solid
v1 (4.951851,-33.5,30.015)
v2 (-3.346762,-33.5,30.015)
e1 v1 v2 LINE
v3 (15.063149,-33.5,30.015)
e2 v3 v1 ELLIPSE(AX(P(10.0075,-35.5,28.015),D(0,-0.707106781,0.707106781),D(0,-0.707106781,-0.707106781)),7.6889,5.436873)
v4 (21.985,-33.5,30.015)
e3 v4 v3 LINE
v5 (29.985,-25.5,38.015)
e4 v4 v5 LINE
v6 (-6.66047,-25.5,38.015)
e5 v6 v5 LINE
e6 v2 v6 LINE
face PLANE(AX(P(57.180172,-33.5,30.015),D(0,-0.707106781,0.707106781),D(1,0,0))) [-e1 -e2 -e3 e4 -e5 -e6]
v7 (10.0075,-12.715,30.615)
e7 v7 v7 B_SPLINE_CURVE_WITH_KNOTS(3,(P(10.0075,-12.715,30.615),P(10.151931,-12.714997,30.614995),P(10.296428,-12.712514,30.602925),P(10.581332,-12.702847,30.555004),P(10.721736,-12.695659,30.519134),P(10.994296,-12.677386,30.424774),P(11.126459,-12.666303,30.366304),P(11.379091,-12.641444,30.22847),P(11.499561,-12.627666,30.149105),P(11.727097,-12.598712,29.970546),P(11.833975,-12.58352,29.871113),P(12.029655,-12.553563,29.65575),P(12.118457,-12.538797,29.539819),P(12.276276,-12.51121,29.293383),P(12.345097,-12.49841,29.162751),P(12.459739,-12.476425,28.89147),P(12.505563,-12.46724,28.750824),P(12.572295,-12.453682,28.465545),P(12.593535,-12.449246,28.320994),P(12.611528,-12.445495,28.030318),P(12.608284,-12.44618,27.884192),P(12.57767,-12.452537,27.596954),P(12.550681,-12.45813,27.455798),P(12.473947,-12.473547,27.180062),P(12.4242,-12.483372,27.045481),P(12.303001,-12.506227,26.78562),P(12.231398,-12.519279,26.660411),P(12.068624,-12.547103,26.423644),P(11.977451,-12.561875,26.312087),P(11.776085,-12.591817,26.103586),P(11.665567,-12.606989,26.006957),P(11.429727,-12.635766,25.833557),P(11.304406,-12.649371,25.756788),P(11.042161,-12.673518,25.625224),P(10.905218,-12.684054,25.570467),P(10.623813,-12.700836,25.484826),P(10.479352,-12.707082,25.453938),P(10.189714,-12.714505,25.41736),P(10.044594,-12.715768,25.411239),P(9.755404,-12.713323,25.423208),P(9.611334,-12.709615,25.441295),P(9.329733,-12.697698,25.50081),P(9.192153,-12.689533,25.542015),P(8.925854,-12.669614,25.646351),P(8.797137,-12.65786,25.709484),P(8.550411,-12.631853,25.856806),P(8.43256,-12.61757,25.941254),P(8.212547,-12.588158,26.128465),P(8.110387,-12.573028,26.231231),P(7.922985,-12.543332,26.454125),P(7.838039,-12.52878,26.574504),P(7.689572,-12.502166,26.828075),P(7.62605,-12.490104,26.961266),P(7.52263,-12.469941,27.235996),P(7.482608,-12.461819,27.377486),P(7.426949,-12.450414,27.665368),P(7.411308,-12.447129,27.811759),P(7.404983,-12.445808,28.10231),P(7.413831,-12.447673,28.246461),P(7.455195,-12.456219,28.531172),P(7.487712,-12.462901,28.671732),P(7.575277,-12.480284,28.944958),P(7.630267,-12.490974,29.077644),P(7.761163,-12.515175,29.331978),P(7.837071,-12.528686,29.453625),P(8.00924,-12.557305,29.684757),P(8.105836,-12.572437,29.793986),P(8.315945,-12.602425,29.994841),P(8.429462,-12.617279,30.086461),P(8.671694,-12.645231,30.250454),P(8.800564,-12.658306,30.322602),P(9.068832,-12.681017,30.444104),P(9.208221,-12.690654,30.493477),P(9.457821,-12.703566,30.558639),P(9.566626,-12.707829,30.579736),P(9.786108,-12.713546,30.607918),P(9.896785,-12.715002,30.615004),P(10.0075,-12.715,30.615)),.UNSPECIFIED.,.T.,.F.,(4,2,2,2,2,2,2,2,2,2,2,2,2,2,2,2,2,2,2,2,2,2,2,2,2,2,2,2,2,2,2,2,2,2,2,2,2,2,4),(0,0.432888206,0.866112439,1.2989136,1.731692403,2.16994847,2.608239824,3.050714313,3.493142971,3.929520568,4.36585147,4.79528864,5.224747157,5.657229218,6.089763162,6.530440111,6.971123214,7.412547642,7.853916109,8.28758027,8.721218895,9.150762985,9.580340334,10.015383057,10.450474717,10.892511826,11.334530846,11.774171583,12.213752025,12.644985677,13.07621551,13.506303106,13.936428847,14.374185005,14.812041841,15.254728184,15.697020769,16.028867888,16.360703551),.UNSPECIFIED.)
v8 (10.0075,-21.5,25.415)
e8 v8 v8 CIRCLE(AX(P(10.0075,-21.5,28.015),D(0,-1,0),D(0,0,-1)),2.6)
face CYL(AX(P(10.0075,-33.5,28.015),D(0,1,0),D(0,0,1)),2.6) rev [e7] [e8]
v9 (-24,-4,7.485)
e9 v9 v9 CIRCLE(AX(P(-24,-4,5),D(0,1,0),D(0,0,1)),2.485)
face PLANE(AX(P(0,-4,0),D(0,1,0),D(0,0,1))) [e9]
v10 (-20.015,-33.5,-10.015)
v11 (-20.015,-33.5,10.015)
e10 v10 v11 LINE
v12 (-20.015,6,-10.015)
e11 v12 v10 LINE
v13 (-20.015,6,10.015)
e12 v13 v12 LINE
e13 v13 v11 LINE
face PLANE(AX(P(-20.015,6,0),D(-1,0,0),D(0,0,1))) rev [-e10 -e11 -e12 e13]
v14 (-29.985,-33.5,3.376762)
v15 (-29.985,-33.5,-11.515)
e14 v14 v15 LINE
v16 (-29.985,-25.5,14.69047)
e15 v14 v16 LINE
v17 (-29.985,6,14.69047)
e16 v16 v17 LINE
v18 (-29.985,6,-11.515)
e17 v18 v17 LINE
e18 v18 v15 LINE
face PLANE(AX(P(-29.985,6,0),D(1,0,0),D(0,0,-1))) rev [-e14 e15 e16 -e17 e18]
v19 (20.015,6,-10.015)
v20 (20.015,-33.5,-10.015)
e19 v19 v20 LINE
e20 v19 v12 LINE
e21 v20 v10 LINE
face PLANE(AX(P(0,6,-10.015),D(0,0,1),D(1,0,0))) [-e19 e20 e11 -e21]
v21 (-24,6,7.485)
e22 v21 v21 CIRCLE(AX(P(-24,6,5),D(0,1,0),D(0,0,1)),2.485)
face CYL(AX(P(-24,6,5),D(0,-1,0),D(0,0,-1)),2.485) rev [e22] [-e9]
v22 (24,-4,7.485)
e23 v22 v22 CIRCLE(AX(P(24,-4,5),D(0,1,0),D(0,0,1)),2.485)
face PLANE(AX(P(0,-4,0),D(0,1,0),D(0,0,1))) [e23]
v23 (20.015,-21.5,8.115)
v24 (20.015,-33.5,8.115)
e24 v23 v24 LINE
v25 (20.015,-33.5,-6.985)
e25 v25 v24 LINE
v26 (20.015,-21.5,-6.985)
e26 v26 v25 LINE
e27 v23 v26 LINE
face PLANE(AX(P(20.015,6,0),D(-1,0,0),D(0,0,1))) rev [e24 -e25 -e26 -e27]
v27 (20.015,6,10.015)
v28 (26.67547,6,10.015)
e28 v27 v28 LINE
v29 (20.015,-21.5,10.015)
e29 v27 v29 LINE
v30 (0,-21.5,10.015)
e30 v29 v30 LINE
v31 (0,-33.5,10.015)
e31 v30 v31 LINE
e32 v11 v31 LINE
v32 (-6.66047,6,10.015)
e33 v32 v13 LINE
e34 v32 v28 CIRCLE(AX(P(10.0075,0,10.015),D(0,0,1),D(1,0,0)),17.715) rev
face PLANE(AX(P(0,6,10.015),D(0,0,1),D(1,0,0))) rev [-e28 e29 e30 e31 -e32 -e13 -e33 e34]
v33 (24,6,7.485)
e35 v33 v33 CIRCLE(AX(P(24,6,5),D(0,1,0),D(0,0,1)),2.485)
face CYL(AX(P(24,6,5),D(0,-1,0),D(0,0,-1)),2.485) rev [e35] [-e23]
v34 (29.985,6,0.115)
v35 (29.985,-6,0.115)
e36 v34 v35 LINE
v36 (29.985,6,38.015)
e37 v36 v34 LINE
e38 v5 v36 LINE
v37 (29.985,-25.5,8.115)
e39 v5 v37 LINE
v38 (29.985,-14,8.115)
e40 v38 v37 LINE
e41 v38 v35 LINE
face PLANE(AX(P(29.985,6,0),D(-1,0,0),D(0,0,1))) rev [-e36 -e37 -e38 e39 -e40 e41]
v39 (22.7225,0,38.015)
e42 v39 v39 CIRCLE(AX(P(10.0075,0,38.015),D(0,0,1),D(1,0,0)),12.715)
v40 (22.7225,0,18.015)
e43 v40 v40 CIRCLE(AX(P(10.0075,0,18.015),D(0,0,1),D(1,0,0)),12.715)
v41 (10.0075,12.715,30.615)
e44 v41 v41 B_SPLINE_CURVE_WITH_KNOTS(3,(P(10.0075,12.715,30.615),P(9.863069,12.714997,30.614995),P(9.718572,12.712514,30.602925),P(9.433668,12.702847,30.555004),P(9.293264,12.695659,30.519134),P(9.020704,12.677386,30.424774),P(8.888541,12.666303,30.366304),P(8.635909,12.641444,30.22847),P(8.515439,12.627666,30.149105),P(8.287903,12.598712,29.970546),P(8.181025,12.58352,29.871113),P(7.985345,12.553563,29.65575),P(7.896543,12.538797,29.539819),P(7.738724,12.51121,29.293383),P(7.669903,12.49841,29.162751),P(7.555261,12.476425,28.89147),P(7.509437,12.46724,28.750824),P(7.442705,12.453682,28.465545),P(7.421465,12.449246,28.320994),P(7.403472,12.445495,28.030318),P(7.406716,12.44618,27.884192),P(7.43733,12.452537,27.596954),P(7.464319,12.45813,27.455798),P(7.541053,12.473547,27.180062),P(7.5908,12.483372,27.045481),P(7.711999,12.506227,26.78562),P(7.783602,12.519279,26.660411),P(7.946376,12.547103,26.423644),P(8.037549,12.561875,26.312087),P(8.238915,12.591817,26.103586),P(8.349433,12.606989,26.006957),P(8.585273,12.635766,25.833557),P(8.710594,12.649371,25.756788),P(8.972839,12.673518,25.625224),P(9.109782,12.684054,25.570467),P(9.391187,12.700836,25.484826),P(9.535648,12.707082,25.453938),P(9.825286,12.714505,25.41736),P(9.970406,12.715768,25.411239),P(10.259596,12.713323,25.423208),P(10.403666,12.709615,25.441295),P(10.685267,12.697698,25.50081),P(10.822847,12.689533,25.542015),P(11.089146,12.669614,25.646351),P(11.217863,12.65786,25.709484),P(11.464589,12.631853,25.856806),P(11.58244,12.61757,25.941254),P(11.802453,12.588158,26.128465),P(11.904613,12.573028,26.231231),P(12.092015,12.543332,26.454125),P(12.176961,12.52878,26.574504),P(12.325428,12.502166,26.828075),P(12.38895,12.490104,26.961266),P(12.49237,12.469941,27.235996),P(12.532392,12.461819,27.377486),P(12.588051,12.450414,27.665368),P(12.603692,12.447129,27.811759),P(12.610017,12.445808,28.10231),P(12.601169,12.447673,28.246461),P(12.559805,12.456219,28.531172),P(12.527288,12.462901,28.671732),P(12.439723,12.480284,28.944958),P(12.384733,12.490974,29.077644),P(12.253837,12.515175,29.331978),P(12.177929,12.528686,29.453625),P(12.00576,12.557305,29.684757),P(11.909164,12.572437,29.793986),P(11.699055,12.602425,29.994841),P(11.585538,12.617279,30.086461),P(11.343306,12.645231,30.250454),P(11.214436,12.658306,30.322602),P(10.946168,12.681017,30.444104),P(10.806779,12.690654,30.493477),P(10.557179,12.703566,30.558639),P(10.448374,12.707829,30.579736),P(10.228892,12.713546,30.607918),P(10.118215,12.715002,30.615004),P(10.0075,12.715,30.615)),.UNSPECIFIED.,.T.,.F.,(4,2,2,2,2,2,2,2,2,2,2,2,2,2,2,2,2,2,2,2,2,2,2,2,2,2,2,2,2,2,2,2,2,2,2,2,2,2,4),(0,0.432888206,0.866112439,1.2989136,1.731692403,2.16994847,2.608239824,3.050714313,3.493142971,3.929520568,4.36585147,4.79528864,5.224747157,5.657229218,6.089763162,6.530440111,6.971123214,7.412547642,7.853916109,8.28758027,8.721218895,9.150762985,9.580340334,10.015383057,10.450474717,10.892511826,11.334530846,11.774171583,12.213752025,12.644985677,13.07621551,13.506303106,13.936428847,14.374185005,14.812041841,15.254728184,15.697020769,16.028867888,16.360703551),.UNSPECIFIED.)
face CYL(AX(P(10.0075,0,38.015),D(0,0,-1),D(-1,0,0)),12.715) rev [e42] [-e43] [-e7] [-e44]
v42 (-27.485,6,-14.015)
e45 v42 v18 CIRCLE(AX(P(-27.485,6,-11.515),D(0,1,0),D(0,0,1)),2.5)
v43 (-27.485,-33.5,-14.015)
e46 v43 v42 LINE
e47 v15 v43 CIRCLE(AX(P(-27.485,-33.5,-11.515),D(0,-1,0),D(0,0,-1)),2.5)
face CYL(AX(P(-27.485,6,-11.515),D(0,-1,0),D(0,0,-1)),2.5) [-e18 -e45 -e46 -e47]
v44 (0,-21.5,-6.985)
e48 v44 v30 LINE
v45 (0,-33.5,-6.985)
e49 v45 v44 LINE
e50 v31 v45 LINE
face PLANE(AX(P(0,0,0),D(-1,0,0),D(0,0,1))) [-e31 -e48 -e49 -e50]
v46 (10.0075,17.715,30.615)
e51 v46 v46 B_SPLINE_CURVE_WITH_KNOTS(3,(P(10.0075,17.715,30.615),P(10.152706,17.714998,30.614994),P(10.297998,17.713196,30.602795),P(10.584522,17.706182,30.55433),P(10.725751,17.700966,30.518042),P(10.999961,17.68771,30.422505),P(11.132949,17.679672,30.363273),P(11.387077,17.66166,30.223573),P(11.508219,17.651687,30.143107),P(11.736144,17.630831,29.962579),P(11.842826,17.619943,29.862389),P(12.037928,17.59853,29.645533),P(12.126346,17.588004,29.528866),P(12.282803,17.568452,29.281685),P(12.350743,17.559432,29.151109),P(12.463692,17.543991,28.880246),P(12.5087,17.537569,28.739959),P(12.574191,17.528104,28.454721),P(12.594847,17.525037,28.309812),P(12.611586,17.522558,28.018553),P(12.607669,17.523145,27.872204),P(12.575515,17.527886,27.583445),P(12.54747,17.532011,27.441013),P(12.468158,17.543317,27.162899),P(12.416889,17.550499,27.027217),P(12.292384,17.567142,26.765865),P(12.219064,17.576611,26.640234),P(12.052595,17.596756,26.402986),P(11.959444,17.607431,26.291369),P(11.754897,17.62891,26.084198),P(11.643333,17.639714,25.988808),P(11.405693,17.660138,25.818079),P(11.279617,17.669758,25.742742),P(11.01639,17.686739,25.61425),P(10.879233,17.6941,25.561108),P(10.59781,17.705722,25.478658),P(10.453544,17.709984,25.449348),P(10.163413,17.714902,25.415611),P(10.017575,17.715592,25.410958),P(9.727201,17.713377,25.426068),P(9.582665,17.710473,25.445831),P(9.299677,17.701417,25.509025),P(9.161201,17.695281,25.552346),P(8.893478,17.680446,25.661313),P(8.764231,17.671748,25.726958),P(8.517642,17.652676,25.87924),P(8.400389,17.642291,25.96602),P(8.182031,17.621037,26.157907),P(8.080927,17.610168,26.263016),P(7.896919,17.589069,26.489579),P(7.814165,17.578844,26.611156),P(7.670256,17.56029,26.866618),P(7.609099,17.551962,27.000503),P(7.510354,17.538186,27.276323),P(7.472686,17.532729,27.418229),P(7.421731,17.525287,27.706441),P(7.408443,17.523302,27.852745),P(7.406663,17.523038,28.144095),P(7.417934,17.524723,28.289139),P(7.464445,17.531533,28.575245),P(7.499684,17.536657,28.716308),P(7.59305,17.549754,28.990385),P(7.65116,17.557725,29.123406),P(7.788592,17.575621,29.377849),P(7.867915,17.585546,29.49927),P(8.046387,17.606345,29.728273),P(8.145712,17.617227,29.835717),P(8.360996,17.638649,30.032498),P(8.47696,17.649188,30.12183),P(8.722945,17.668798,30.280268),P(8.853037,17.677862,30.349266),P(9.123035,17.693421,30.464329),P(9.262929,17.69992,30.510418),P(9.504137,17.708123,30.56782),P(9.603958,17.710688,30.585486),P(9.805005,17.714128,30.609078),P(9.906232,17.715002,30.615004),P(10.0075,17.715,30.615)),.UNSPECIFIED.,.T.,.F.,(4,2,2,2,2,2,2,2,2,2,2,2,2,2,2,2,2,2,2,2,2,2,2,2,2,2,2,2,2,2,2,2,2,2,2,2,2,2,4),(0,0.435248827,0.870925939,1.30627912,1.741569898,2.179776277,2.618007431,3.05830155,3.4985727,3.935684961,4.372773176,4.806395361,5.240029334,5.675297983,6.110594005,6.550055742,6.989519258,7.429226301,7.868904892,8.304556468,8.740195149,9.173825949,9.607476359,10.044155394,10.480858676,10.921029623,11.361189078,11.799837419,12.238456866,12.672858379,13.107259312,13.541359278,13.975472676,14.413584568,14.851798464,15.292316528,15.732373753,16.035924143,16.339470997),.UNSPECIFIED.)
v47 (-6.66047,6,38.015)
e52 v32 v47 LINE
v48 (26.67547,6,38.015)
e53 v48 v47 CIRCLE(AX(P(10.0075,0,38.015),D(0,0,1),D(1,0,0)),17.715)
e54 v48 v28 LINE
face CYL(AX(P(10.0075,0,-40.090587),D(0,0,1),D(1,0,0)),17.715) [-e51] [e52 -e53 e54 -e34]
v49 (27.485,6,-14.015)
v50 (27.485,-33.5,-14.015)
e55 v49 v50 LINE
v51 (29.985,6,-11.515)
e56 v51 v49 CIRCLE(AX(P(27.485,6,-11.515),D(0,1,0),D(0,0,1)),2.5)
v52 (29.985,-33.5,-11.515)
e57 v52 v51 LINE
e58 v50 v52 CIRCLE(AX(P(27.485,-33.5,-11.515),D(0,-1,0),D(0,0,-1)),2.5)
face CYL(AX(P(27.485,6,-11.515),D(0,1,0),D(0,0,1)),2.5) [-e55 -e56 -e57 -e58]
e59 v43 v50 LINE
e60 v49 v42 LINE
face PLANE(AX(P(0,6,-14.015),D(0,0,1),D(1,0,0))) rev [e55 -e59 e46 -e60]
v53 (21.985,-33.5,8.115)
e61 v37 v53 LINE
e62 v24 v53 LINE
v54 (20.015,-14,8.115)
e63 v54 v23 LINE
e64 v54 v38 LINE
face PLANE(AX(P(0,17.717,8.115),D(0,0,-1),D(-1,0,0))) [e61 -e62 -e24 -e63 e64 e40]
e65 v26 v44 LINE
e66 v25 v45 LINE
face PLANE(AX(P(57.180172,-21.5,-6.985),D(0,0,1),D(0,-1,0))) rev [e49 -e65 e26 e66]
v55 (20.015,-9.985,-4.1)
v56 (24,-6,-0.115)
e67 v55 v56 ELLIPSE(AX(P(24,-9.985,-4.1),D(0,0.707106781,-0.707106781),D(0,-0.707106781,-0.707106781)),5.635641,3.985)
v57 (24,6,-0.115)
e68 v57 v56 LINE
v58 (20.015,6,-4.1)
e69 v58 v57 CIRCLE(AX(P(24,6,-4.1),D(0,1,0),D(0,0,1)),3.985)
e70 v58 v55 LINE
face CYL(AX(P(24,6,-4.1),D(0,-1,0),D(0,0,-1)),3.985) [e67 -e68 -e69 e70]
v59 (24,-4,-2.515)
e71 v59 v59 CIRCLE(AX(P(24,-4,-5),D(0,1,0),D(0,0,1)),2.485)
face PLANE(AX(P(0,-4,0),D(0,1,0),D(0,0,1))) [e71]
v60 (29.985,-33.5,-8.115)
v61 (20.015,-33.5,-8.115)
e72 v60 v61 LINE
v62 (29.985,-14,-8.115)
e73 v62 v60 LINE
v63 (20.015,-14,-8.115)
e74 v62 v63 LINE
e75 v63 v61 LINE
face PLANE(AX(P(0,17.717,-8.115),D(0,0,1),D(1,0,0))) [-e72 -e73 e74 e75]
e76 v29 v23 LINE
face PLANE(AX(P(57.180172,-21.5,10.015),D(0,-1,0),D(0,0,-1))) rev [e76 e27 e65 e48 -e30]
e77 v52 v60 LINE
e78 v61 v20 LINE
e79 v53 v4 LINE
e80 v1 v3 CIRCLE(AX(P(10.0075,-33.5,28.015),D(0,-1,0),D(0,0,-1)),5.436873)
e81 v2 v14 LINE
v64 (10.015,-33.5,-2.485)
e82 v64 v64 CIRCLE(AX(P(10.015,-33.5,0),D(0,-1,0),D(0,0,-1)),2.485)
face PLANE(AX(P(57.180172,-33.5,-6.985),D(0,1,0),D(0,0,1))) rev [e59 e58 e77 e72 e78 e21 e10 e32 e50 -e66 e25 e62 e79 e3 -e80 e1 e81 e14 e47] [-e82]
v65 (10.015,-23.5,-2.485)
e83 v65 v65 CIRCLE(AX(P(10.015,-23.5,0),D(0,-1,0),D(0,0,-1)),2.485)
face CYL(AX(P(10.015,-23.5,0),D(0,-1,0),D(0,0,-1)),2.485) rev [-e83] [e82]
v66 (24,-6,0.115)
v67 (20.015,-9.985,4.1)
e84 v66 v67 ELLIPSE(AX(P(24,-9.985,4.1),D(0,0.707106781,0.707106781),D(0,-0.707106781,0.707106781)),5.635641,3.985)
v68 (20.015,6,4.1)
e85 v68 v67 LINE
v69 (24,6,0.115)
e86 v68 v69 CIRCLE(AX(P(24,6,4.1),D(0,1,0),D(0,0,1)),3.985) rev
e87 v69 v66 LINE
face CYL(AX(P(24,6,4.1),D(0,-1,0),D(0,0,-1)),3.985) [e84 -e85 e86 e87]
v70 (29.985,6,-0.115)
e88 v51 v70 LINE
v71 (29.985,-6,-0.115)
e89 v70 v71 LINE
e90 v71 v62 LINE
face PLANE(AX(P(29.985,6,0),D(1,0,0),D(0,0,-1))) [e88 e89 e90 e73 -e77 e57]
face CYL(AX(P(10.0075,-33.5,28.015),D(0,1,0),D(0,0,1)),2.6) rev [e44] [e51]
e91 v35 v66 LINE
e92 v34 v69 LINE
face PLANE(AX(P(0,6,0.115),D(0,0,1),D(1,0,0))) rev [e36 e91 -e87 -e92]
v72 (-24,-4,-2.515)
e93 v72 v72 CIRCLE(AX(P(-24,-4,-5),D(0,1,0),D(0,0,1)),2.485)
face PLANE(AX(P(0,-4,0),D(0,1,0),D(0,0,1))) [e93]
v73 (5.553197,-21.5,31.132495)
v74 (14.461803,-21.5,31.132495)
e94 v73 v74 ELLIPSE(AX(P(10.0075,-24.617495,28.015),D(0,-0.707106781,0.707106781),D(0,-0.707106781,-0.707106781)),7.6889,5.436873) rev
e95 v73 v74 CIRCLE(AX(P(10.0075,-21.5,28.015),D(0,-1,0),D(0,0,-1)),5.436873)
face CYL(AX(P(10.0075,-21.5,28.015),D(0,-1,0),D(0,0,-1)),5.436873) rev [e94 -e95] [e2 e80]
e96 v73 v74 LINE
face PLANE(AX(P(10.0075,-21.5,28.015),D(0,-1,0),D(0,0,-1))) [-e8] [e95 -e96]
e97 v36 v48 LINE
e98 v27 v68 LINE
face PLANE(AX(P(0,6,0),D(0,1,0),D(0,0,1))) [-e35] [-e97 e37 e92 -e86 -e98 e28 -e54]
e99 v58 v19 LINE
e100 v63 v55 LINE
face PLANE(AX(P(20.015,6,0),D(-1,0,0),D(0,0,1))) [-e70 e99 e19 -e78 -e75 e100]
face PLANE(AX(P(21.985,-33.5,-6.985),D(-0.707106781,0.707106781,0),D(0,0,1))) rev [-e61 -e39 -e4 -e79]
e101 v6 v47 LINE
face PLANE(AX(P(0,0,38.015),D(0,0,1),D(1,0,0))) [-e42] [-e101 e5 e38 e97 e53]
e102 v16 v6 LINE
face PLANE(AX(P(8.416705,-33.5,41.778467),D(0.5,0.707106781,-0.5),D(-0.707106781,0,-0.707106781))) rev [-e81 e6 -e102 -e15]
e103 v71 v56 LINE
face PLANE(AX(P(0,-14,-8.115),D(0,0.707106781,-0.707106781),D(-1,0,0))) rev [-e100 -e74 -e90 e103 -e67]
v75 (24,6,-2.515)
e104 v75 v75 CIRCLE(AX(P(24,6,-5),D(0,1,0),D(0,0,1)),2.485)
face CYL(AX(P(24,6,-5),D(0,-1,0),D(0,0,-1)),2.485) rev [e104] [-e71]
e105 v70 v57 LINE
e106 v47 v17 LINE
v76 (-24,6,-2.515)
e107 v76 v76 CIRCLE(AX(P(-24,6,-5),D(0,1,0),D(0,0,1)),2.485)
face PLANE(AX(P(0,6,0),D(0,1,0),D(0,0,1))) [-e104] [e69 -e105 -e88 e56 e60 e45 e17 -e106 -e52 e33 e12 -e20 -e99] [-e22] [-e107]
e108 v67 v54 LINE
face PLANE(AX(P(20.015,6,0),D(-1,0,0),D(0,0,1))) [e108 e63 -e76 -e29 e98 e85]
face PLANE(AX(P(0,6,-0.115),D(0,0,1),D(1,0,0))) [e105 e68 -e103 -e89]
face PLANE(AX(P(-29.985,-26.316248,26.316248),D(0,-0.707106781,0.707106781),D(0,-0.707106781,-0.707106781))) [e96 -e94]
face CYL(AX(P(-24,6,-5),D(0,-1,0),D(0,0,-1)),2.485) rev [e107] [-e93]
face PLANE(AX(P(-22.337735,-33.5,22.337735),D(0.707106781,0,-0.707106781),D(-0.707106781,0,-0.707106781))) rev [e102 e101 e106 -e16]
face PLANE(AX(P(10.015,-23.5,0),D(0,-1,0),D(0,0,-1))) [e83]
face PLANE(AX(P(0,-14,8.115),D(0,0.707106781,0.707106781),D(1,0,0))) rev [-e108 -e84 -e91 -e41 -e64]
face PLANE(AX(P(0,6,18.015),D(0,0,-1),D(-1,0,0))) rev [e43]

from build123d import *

# Parameters (mm, degrees)
SKETCH1_R               = 2.485
SKETCH1_W               = 55.97
SKETCH1_H               = 4
SKETCH1_W_2             = 2
BOSS_EXTRUDE1_DEPTH     = 6
SKETCH2_R               = 2.485
BOSS_EXTRUDE2_DEPTH     = 2
BOSS_EXTRUDE3_DEPTH     = 20.015
SKETCH6_R               = 2.485
CUT_EXTRUDE3_DEPTH      = 10
SKETCH11_R              = 17.715
BOSS_EXTRUDE4_DEPTH     = 8
BOSS_EXTRUDE5_START     = 20
SKETCH11_3_R            = 17.715
SKETCH11_3_R_2          = 12.715
BOSS_EXTRUDE5_DEPTH     = 20
BOSS_EXTRUDE7_DEPTH     = 20
CUT_EXTRUDE7_DEPTH      = 63.485922014
CUT_EXTRUDE7_DEPTH_BACK = 63.485922014
CUT_EXTRUDE8_DEPTH      = 72.185604057
CUT_EXTRUDE8_DEPTH_BACK = 72.185604057
FILLET1_R               = 2.5
CUT_EXTRUDE9_DEPTH      = 59.876909311
CUT_EXTRUDE9_DEPTH_BACK = 59.876909311
SKETCH16_R              = 2.6
SKETCH17_R              = 5.436873337
SKETCH17_R_2            = 2.6
CUT_EXTRUDE10_DEPTH     = 12
BOSS_EXTRUDE8_REACH     = 72.478
SKETCH18_R              = 5.436873337
CHAMFER1_SIZE           = 8
CHAMFER2_SIZE           = 8


# Some blends are built 0.0001 mm under size
with BuildPart() as part:
    # Sketch1 → Boss-Extrude1 (new, symmetric)
    # profile 1 of 8: a face of its own
    with BuildSketch(Plane(origin=(0, 0, 0), x_dir=(1, 0, 0), z_dir=(0, 1, 0))):
        with BuildLine():
            ThreePointArc((24, -0.115), (21.182179477, -1.282179477), (20.015, -4.1))
            Line((20.015, -4.1), (20.015, -10.015))
            Line((20.015, -10.015), (-20.015, -10.015))
            Line((-20.015, -10.015), (-20.015, 10.015))
            Line((-20.015, 10.015), (20.015, 10.015))
            Line((20.015, 10.015), (20.015, 4.1))
            ThreePointArc((20.015, 4.1), (21.182179477, 1.282179477), (24, 0.115))
            ThreePointArc((24, 0.115), (26.817820523, 1.282179477), (27.985, 4.1))
            Line((27.985, 4.1), (27.985, 14.015))
            Line((27.985, 14.015), (-27.985, 14.015))
            Line((-27.985, 14.015), (-27.985, -14.015))
            Line((-27.985, -14.015), (27.985, -14.015))
            Line((27.985, -14.015), (27.985, -4.1))
            ThreePointArc((27.985, -4.1), (26.817820523, -1.282179477), (24, -0.115))
        make_face()
        with Locations(Location((-24, -5, 0), (0, 0, 270))):
            Circle(SKETCH1_R, mode=Mode.SUBTRACT)
        with Locations(Location((-24, 5, 0), (0, 0, 270))):
            Circle(SKETCH1_R, mode=Mode.SUBTRACT)
        with Locations(Location((24, -5, 0), (0, 0, 270))):
            Circle(SKETCH1_R, mode=Mode.SUBTRACT)
        with Locations(Location((24, 5, 0), (0, 0, 270))):
            Circle(SKETCH1_R, mode=Mode.SUBTRACT)
    # profile 2 of 8: a face of its own
    with BuildSketch(Plane(origin=(0, 0, 0), x_dir=(1, 0, 0), z_dir=(0, 1, 0))):
        with Locations((0, -16.015)):
            Rectangle(SKETCH1_W, SKETCH1_H)
    # profile 3 of 8: a face of its own
    with BuildSketch(Plane(origin=(0, 0, 0), x_dir=(1, 0, 0), z_dir=(0, 1, 0))):
        Polygon((27.985, 4.1), (27.985, 0.115), (29.985, 0.115), (29.985, 14.015), (27.985, 14.015), align=None)
    # profile 4 of 8: a face of its own
    with BuildSketch(Plane(origin=(0, 0, 0), x_dir=(1, 0, 0), z_dir=(0, 1, 0))):
        Polygon((29.985, -0.115), (27.985, -0.115), (27.985, -4.1), (27.985, -14.015), (29.985, -14.015), align=None)
    # profile 5 of 8: a face of its own
    with BuildSketch(Plane(origin=(0, 0, 0), x_dir=(1, 0, 0), z_dir=(0, 1, 0))):
        with BuildLine():
            Line((27.985, -4.1), (27.985, -0.115))
            Line((27.985, -0.115), (24, -0.115))
            ThreePointArc((24, -0.115), (26.817820523, -1.282179477), (27.985, -4.1))
        make_face()
    # profile 6 of 8: a face of its own
    with BuildSketch(Plane(origin=(0, 0, 0), x_dir=(1, 0, 0), z_dir=(0, 1, 0))):
        with BuildLine():
            Line((24, 0.115), (27.985, 0.115))
            Line((27.985, 0.115), (27.985, 4.1))
            ThreePointArc((27.985, 4.1), (26.817820523, 1.282179477), (24, 0.115))
        make_face()
    # profile 7 of 8: a face of its own
    with BuildSketch(Plane(origin=(0, 0, 0), x_dir=(1, 0, 0), z_dir=(0, 1, 0))):
        with Locations((28.985, -16.015)):
            Rectangle(SKETCH1_W_2, SKETCH1_H)
    # profile 8 of 8: a face of its own
    with BuildSketch(Plane(origin=(0, 0, 0), x_dir=(1, 0, 0), z_dir=(0, 1, 0))):
        Polygon((-29.985, 14.015), (-29.985, -18.015), (-27.985, -18.015), (-27.985, -14.015), (-27.985, 14.015), align=None)
    extrude(amount=BOSS_EXTRUDE1_DEPTH, both=True)

    # Sketch2 → Boss-Extrude2 (add)
    with BuildSketch(Plane.XZ.offset(6)):
        with Locations(Location((24, -5, 0), (0, 0, 90))):
            Circle(SKETCH2_R)
        with Locations(Location((24, 5, 0), (0, 0, 90))):
            Circle(SKETCH2_R)
        with Locations(Location((-24, -5, 0), (0, 0, 90))):
            Circle(SKETCH2_R)
        with Locations(Location((-24, 5, 0), (0, 0, 90))):
            Circle(SKETCH2_R)
    extrude(amount=-BOSS_EXTRUDE2_DEPTH)

    # Sketch5 → Boss-Extrude3 (add)
    with BuildSketch(Plane(origin=(0, 0, 0), x_dir=(0, 0, -1), z_dir=(1, 0, 0))):
        Polygon((-18.015, -6), (-10.015, -6), (-10.015, -21.5), (6.985, -21.5), (6.985, -33.5), (-18.015, -33.5), align=None)
    extrude(amount=BOSS_EXTRUDE3_DEPTH)

    # Sketch6 → Cut-Extrude3 (cut)
    with BuildSketch(Plane.XZ.offset(33.5)):
        with Locations(Location((10.015, 0, 0), (0, 0, 270))):
            Circle(SKETCH6_R)
    extrude(amount=-CUT_EXTRUDE3_DEPTH, mode=Mode.SUBTRACT)

    # Sketch11 → Boss-Extrude4 (add)
    with BuildSketch(Plane.XY.offset(18.015)):
        with Locations((10.0075, 0)):
            Circle(SKETCH11_R)
    extrude(amount=-BOSS_EXTRUDE4_DEPTH)

    # Sketch11<3> → Boss-Extrude5 (add)
    with BuildSketch(Plane.XY.offset(18.015).offset(BOSS_EXTRUDE5_START)):
        with Locations((10.0075, 0)):
            Circle(SKETCH11_3_R)
        with Locations((10.0075, 0)):
            Circle(SKETCH11_3_R_2, mode=Mode.SUBTRACT)
    extrude(amount=-BOSS_EXTRUDE5_DEPTH)

    # Sketch13 → Boss-Extrude7 (add)
    with BuildSketch(Plane.XY.offset(38.015)):
        with BuildLine():
            ThreePointArc((20.015, -14.617495297), (10.0075, -17.715), (0, -14.617495297))
            Line((0, -14.617495297), (0, -33.5))
            Line((0, -33.5), (20.015, -33.5))
            Line((20.015, -33.5), (20.015, -14.617495297))
        make_face()
        with BuildLine():
            Line((-29.985, -6), (-6.660470032, -6))
            ThreePointArc((-6.660470032, -6), (-7.7075, 0), (-6.660470032, 6))
            Line((-6.660470032, 6), (-29.985, 6))
            Line((-29.985, 6), (-29.985, -6))
        make_face()
        with BuildLine():
            ThreePointArc((27.7225, 0), (27.458779525, -3.045335439), (26.675470032, -6))
            Line((26.675470032, -6), (29.985, -6))
            Line((29.985, -6), (29.985, 6))
            Line((29.985, 6), (26.675470032, 6))
            ThreePointArc((26.675470032, 6), (27.458779525, 3.045335439), (27.7225, 0))
        make_face()
    extrude(amount=-BOSS_EXTRUDE7_DEPTH)

    # Sketch14 → Cut-Extrude7 (cut, two sides: drawn at the far end of the back side and taken through both)
    with BuildSketch(Plane(origin=(0, 6, 0), x_dir=(1, 0, 0), z_dir=(0, 1, 0)).offset(-CUT_EXTRUDE7_DEPTH_BACK)):
        Polygon((-29.985, -38.015), (-6.660470032, -38.015), (-29.985, -14.690470032), align=None)
    extrude(amount=CUT_EXTRUDE7_DEPTH + CUT_EXTRUDE7_DEPTH_BACK, mode=Mode.SUBTRACT)

    # Sketch15 → Cut-Extrude8 (cut, two sides: drawn at the far end of the back side and taken through both)
    with BuildSketch(Plane(origin=(20.015, 0, 0), x_dir=(0, 0, -1), z_dir=(1, 0, 0)).offset(-CUT_EXTRUDE8_DEPTH_BACK)):
        Polygon((-19.132495297, -33.5), (-38.015, -14.617495297), (-38.015, -33.5), align=None)
    extrude(amount=CUT_EXTRUDE8_DEPTH + CUT_EXTRUDE8_DEPTH_BACK, mode=Mode.SUBTRACT)

    # Fillet1
    fillet1_edges = [part.edges().sort_by_distance(p)[0] for p in [
        (-29.985, 0, -14.015),
        (29.985, 0, -14.015),
    ]]
    fillet(fillet1_edges, radius=FILLET1_R)

    # Sketch16 → Cut-Extrude9 (cut, two sides: drawn at the far end of the back side and taken through both)
    with BuildSketch(Plane(origin=(0, 0, 0), x_dir=(1, 0, 0), z_dir=(0, 1, 0)).offset(-CUT_EXTRUDE9_DEPTH_BACK)):
        with Locations(Location((10.0075, -28.015, 0), (0, 0, 270))):
            Circle(SKETCH16_R)
    extrude(amount=CUT_EXTRUDE9_DEPTH + CUT_EXTRUDE9_DEPTH_BACK, mode=Mode.SUBTRACT)

    # Sketch17 → Cut-Extrude10 (cut)
    with BuildSketch(Plane.XZ.offset(33.5)):
        with Locations((10.0075, 28.015)):
            Circle(SKETCH17_R)
        with Locations(Location((10.0075, 28.015, 0), (0, 0, 90))):
            Circle(SKETCH17_R_2, mode=Mode.SUBTRACT)
    extrude(amount=-CUT_EXTRUDE10_DEPTH, mode=Mode.SUBTRACT)

    # Sketch18 → Boss-Extrude8 (add, up to next)
    with BuildSketch(Plane.XZ.offset(33.5), mode=Mode.PRIVATE) as boss_extrude8_sk1:
        with BuildLine():
            Line((29.985, 38.015), (-6.660470032, 38.015))
            Line((-6.660470032, 38.015), (-29.985, 14.690470032))
            Line((-29.985, 14.690470032), (-29.985, -11.515))
            ThreePointArc((-29.985, -11.515), (-29.252766953, -13.282766953), (-27.485, -14.015))
            Line((-27.485, -14.015), (27.485, -14.015))
            ThreePointArc((27.485, -14.015), (29.252766953, -13.282766953), (29.985, -11.515))
            Line((29.985, -11.515), (29.985, -8.115))
            Line((29.985, -8.115), (20.015, -8.115))
            Line((20.015, -8.115), (20.015, -10.015))
            Line((20.015, -10.015), (-20.015, -10.015))
            Line((-20.015, -10.015), (-20.015, 10.015))
            Line((-20.015, 10.015), (0, 10.015))
            Line((0, 10.015), (0, 19.132495297))
            Line((0, 19.132495297), (20.015, 19.132495297))
            Line((20.015, 19.132495297), (20.015, 10.015))
            Line((20.015, 10.015), (20.015, 8.115))
            Line((20.015, 8.115), (29.985, 8.115))
            Line((29.985, 8.115), (29.985, 38.015))
        make_face()
        with Locations(Location((10.0075, 28.015, 0), (0, 0, 270))):
            Circle(SKETCH18_R, mode=Mode.SUBTRACT)
    boss_extrude8_tool1 = extrude(boss_extrude8_sk1.sketch, amount=-BOSS_EXTRUDE8_REACH, mode=Mode.PRIVATE) - part.part
    add(boss_extrude8_tool1.solids().sort_by_distance((-0.47266, -33.5, 14.933652))[0])

    # Chamfer1
    chamfer1_edges = [part.edges().sort_by_distance(p)[0] for p in [
        (25, -6, -8.115),
        (25, -6, 8.115),
    ]]
    chamfer(chamfer1_edges, length=CHAMFER1_SIZE - 0.0001)  # a hair under: the kernel refuses the full size

    # Chamfer2
    # the kernel refuses this chamfer: 8 mm, written as the material it takes off along each edge
    with BuildSketch(Plane(origin=(29.985, -33.5, 8.115), x_dir=(-0.9996219169112968, -0.027495876610586487, 0), z_dir=(0, 0, 1))) as chamfer2_piece_1:
        Polygon((CHAMFER2_SIZE * 0.999621916911, -CHAMFER2_SIZE * 0.0274958766106), (-CHAMFER2_SIZE * 0.0274958766106, -CHAMFER2_SIZE * 0.999621916911), (0, 0), align=None)
    extrude(amount=50.473463904, mode=Mode.SUBTRACT)
    with BuildSketch(Plane(origin=(50.558463904, -33.5, 38.015), x_dir=(0, -0.027495876610586487, -0.9996219169112968), z_dir=(-1, 0, 0))) as chamfer2_piece_2:
        Polygon((CHAMFER2_SIZE * 0.999621916911, -CHAMFER2_SIZE * 0.0274958766106), (-CHAMFER2_SIZE * 0.0274958766106, -CHAMFER2_SIZE * 0.999621916911), (0, 0), align=None)
    extrude(amount=77.79239784, mode=Mode.SUBTRACT)
    with BuildSketch(Plane(origin=(7.887165806, -33.5, 52.562635839), x_dir=(0.7068394360706746, -0.027495876610586497, -0.7068394360706723), z_dir=(-0.7071067811865466, 0, -0.7071067811865486))) as chamfer2_piece_3:
        Polygon((CHAMFER2_SIZE * 0.999621916911, -CHAMFER2_SIZE * 0.0274958766106), (-CHAMFER2_SIZE * 0.0274958766106, -CHAMFER2_SIZE * 0.999621916911), (0, 0), align=None)
    extrude(amount=74.132794424, mode=Mode.SUBTRACT)


solid = part.part
